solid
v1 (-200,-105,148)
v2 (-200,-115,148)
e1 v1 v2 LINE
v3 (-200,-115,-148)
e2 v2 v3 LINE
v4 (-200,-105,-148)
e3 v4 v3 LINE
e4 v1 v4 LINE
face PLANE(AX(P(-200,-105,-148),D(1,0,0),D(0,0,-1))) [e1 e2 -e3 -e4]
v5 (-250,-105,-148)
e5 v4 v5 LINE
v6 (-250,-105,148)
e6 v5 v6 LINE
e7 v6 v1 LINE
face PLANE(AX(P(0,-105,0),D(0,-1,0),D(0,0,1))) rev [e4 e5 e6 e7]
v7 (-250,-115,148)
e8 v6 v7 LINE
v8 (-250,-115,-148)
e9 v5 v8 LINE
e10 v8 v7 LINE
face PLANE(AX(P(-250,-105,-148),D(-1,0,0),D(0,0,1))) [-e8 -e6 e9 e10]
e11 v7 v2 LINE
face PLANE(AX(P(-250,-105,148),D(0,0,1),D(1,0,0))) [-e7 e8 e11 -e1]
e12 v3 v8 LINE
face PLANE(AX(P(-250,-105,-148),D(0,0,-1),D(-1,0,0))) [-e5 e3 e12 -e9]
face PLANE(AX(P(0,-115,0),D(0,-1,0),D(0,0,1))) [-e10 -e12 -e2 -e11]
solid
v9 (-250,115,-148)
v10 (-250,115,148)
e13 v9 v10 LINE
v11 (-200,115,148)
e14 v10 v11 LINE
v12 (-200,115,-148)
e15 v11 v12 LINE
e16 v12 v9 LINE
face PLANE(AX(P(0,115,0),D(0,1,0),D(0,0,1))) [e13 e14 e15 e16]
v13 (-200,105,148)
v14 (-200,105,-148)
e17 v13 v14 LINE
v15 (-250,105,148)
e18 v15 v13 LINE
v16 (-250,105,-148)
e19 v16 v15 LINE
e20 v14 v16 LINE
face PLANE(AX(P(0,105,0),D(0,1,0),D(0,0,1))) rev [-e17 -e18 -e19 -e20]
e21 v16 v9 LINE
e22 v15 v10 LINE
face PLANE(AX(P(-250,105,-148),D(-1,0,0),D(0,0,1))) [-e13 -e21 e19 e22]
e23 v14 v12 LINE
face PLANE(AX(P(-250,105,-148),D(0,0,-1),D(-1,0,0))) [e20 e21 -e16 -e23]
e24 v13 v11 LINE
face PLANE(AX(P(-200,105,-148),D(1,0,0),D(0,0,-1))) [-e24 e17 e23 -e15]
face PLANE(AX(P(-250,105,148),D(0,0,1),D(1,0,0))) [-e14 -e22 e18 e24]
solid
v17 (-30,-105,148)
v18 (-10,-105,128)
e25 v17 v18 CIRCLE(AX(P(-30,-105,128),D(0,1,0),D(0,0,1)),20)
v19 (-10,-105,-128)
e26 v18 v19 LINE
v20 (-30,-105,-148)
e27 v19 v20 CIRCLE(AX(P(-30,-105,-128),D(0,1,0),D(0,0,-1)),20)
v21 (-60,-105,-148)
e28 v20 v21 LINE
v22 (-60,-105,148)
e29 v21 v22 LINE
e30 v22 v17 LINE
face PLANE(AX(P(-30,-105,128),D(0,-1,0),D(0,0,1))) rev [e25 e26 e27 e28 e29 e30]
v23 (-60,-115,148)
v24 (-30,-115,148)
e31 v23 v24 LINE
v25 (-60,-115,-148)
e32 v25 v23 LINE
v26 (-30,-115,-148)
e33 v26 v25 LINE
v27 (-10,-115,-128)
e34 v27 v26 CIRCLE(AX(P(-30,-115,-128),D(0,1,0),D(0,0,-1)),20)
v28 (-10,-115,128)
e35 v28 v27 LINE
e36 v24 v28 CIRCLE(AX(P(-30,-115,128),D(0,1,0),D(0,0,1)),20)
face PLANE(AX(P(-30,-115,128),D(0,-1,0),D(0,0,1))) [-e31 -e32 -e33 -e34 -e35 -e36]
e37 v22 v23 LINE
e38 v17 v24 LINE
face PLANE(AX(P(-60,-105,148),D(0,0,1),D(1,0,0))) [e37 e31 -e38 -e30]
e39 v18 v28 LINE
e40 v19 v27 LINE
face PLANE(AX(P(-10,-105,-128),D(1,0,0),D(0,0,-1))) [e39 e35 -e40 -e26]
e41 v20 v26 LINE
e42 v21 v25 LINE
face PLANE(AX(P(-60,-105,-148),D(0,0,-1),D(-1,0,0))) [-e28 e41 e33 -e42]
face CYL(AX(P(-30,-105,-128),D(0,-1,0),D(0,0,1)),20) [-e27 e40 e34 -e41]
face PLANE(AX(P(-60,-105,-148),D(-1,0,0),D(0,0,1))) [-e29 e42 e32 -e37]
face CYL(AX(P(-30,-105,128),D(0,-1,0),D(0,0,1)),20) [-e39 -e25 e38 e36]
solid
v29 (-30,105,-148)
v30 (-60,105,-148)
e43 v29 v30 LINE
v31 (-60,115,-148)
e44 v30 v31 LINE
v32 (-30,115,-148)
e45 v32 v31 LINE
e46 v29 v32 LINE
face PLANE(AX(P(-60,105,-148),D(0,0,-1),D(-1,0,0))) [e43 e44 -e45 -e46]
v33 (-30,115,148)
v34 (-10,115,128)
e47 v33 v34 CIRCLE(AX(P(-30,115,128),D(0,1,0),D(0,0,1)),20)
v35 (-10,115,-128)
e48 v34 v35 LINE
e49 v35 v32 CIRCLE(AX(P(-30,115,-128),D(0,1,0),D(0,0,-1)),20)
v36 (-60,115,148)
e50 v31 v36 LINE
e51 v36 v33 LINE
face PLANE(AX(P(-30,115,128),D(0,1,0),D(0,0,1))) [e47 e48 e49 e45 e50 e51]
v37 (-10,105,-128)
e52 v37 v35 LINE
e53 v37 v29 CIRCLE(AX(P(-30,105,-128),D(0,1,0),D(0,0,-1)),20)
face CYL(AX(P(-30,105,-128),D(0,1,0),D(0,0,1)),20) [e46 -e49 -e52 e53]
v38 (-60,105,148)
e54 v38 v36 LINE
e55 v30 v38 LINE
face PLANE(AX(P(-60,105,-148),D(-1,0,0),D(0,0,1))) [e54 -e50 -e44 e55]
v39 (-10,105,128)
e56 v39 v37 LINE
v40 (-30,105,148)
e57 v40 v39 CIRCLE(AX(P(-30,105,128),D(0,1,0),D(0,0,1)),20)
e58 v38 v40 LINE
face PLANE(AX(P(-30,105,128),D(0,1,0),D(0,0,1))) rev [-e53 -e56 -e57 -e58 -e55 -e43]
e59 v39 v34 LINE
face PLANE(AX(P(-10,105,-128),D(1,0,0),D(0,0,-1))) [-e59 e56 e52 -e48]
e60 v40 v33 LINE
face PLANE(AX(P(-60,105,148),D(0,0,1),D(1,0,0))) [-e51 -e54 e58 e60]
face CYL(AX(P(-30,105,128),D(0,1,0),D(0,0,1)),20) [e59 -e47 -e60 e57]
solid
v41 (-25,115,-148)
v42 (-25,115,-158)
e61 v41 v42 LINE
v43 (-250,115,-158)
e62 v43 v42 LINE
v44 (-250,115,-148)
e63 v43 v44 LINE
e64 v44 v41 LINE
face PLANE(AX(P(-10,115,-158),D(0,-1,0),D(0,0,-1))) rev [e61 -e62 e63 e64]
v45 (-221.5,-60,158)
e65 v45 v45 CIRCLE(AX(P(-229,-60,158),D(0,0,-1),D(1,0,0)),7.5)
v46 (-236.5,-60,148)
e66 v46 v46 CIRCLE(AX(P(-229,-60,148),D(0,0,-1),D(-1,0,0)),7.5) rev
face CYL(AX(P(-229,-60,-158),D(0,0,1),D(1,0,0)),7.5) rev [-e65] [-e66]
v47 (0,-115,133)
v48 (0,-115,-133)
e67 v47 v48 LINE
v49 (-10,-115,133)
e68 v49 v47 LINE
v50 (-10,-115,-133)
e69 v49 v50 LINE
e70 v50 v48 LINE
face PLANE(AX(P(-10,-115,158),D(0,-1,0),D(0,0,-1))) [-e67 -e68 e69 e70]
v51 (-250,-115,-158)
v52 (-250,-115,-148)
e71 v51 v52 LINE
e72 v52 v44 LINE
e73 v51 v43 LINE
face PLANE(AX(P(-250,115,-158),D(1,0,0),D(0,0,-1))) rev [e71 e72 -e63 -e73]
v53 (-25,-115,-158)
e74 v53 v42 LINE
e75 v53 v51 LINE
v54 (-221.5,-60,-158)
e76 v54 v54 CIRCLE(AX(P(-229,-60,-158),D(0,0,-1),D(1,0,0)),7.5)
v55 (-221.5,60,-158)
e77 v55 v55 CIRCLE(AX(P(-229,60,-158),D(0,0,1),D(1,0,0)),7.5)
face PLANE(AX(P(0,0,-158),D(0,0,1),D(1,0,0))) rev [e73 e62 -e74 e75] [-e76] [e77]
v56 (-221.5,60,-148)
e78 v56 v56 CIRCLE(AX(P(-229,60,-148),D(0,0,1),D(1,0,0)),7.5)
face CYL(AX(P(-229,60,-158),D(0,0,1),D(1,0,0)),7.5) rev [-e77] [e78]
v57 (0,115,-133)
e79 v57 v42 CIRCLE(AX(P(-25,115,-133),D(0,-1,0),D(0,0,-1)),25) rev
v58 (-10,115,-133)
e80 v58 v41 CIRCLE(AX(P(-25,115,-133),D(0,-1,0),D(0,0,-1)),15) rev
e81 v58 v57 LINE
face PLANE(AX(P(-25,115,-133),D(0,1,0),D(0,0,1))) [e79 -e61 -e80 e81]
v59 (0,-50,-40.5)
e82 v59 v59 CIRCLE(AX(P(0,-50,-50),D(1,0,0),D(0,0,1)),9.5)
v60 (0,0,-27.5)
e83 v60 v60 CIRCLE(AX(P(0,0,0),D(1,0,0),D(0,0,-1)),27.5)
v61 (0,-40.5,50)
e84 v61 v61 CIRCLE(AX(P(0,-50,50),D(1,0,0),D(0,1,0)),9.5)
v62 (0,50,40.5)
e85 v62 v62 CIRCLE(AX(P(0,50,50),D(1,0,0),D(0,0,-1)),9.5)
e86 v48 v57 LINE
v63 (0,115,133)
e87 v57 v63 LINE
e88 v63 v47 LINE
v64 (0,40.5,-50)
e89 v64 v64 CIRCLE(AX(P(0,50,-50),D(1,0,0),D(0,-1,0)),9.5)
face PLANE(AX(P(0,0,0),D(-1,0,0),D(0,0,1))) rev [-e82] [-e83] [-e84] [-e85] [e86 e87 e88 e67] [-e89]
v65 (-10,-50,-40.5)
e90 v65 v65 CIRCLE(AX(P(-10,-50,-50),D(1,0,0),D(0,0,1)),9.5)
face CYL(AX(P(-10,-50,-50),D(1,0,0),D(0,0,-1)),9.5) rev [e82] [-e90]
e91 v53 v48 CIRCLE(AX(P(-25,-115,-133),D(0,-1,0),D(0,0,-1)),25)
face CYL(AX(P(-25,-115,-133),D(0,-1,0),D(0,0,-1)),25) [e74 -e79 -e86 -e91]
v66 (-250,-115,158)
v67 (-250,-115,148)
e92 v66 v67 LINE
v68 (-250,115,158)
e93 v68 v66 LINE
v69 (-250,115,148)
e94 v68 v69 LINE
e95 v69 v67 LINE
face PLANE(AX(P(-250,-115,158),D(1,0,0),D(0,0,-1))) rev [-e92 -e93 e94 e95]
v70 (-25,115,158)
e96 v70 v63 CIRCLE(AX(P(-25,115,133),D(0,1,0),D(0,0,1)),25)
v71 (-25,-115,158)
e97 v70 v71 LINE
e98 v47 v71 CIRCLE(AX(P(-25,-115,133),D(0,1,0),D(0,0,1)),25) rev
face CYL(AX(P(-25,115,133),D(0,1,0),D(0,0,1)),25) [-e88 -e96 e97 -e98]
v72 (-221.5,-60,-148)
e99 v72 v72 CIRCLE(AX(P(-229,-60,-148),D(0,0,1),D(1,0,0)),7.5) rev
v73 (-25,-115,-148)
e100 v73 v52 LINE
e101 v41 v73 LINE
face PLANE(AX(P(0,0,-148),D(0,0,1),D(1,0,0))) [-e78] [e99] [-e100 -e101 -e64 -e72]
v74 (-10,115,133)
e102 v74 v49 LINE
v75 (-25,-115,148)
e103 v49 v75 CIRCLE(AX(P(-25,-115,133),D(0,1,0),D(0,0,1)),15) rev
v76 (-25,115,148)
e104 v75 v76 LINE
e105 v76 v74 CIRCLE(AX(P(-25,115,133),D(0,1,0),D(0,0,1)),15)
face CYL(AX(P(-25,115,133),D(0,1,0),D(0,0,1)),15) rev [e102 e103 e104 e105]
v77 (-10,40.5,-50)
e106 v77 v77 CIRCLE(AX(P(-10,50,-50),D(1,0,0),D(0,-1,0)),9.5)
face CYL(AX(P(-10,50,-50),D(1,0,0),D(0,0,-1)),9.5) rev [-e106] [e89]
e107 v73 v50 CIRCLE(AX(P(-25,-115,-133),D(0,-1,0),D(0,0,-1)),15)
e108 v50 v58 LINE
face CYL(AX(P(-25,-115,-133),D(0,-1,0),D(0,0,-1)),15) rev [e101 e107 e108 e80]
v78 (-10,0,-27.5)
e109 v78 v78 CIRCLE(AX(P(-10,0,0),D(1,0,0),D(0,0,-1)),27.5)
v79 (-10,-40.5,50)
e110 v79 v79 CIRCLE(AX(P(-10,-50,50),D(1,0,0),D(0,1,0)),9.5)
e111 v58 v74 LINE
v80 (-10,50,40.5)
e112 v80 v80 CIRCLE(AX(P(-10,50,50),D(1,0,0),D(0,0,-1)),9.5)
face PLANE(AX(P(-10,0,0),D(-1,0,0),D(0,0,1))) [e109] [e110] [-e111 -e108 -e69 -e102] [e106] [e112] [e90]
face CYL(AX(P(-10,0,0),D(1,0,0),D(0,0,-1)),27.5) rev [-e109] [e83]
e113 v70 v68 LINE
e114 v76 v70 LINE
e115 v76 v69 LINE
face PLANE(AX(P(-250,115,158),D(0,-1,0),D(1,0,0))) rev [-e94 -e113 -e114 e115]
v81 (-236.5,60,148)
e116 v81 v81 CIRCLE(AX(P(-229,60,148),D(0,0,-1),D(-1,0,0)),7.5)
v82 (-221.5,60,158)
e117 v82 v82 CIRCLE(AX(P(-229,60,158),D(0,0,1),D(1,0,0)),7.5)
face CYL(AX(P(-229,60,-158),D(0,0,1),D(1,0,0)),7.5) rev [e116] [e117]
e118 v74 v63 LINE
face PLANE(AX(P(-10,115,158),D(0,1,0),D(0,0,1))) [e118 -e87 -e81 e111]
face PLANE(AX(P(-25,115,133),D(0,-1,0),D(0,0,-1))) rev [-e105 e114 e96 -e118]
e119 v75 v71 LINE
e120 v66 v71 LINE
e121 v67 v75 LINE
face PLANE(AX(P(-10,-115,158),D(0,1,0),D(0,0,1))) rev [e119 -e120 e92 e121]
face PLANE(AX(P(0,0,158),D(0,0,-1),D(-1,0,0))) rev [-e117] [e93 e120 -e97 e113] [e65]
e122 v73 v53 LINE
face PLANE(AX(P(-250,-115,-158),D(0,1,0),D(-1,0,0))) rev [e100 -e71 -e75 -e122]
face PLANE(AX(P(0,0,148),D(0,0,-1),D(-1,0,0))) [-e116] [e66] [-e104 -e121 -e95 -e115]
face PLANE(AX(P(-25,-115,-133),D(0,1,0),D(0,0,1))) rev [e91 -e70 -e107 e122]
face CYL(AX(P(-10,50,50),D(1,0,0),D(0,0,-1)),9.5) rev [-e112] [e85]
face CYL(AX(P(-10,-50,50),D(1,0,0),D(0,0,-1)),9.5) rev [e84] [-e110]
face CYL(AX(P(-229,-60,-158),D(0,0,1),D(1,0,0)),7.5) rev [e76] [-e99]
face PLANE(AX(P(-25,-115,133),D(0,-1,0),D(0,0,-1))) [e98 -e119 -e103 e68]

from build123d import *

# Parameters (mm, degrees)
SKETCH1_W                      = 316
SKETCH1_H                      = 230
BASE_FLANGE1_DEPTH             = 10
EDGE_FLANGE1_STRIP_W           = 70
EDGE_FLANGE1_STRIP_H           = 10
EDGE_FLANGE1_STRIP_CUT_DEPTH   = 230
EDGE_FLANGE1_STRIP_2_W         = 70
EDGE_FLANGE1_STRIP_2_H         = 10
EDGE_FLANGE1_STRIP_CUT_2_DEPTH = 230
EDGE_FLANGE1_DEPTH             = 230
EDGE_FLANGE1_BEND_DEPTH        = 230
SKETCH12_R                     = 27.5
CUT_EXTRUDE1_DEPTH             = 10
SKETCH13_R                     = 7.5
CUT_EXTRUDE2_DEPTH             = 420.023865669
SKETCH14_R                     = 9.5
CUT_EXTRUDE3_DEPTH             = 10
BOSS_EXTRUDE1_DEPTH            = 10
SKETCH15_W                     = 50
SKETCH15_H                     = 296
BOSS_EXTRUDE1_2_DEPTH          = 10
CIRPATTERN1_COUNT              = 4


# Sheet-metal steps are written as plain solids
with BuildPart() as part:
    # Sketch1 → Base-Flange1 (new body)
    with BuildSketch(Plane(origin=(0, 0, 0), x_dir=(0, 0, -1), z_dir=(1, 0, 0))):
        Rectangle(SKETCH1_W, SKETCH1_H)
    extrude(amount=-BASE_FLANGE1_DEPTH)

    # Edge-Flange1 strip (across the edge) → Edge-Flange1 strip cut (cut)
    with BuildSketch(Plane(origin=(-10, -115, 158), x_dir=(0, 0, -1), z_dir=(0, 1, 0))):
        with Locations((-10, -5)):
            Rectangle(EDGE_FLANGE1_STRIP_W, EDGE_FLANGE1_STRIP_H)
    extrude(amount=EDGE_FLANGE1_STRIP_CUT_DEPTH, mode=Mode.SUBTRACT)

    # Edge-Flange1 strip 2 (across the edge) → Edge-Flange1 strip cut 2 (cut)
    with BuildSketch(Plane(origin=(-10, 115, -158), x_dir=(0, 0, 1), z_dir=(0, -1, 0))):
        with Locations((-10, -5)):
            Rectangle(EDGE_FLANGE1_STRIP_2_W, EDGE_FLANGE1_STRIP_2_H)
    extrude(amount=EDGE_FLANGE1_STRIP_CUT_2_DEPTH, mode=Mode.SUBTRACT)

    # Edge-Flange1 section (across the edge) → Edge-Flange1 (add)
    with BuildSketch(Plane(origin=(-10, -115, 158), x_dir=(0, 0, -1), z_dir=(0, 1, 0))):
        with BuildLine():
            Line((0, 15), (0, 240))
            Line((0, 240), (10, 240))
            Line((10, 240), (10, 15))
            ThreePointArc((10, 15), (14.393398282, 4.393398282), (25, 0))
            Line((25, 0), (25, -10))
            ThreePointArc((25, -10), (7.32233047, -2.67766953), (0, 15))
        make_face()
    extrude(amount=EDGE_FLANGE1_DEPTH)

    # Edge-Flange1 section 2 (across the edge) → Edge-Flange1 bend (add)
    with BuildSketch(Plane(origin=(-10, 115, -158), x_dir=(0, 0, 1), z_dir=(0, -1, 0))):
        with BuildLine():
            Line((0, 15), (0, 240))
            Line((0, 240), (10, 240))
            Line((10, 240), (10, 15))
            ThreePointArc((10, 15), (14.393398282, 4.393398282), (25, 0))
            Line((25, 0), (25, -10))
            ThreePointArc((25, -10), (7.32233047, -2.67766953), (0, 15))
        make_face()
    extrude(amount=EDGE_FLANGE1_BEND_DEPTH)

    # Sketch12 → Cut-Extrude1 (cut)
    with BuildSketch(Plane(origin=(0, 0, 0), x_dir=(0, 0, -1), z_dir=(1, 0, 0))):
        Circle(SKETCH12_R)
    extrude(amount=-CUT_EXTRUDE1_DEPTH, mode=Mode.SUBTRACT)

    # Sketch13 → Cut-Extrude2 (cut, through all)
    with BuildSketch(Plane.XY.offset(158)):
        with Locations((-229, 60)):
            Circle(SKETCH13_R)
    cut_extrude2 = extrude(amount=-CUT_EXTRUDE2_DEPTH, mode=Mode.SUBTRACT)

    # Sketch14 → Cut-Extrude3 (cut)
    with BuildSketch(Plane(origin=(0, 0, 0), x_dir=(0, 0, -1), z_dir=(1, 0, 0))):
        with Locations((-50, 50)):
            Circle(SKETCH14_R)
    cut_extrude3 = extrude(amount=-CUT_EXTRUDE3_DEPTH, mode=Mode.SUBTRACT)

    # Mirror1: Cut-Extrude2 across plane
    add(cut_extrude2.mirror(Plane.ZX), mode=Mode.SUBTRACT)

    # CirPattern1: Cut-Extrude3 ×4 about axis
    cirpattern1_axis = Axis((0, 0, 0), (1, 0, 0))
    for i in range(1, CIRPATTERN1_COUNT):
        add(cut_extrude3.rotate(cirpattern1_axis, i * 360 / CIRPATTERN1_COUNT), mode=Mode.SUBTRACT)


with BuildPart() as body_2:
    # Sketch15 → Boss-Extrude1 (new body)
    with BuildSketch(Plane(origin=(0, 115, 0), x_dir=(1, 0, 0), z_dir=(0, 1, 0))):
        with BuildLine():
            Line((-60, 148), (-30, 148))
            ThreePointArc((-30, 148), (-15.857864376, 142.142135624), (-10, 128))
            Line((-10, 128), (-10, -128))
            ThreePointArc((-10, -128), (-15.857864376, -142.142135624), (-30, -148))
            Line((-30, -148), (-60, -148))
            Line((-60, -148), (-60, 148))
        make_face()
    extrude(amount=-BOSS_EXTRUDE1_DEPTH)


with BuildPart() as body_3:
    # Sketch15 → Boss-Extrude1 2 (new body)
    with BuildSketch(Plane(origin=(0, 115, 0), x_dir=(1, 0, 0), z_dir=(0, 1, 0))):
        with Locations((-225, 0)):
            Rectangle(SKETCH15_W, SKETCH15_H)
    extrude(amount=-BOSS_EXTRUDE1_2_DEPTH)


with BuildPart() as body_4:
    # Mirror2: mirrored copy
    add(body_2.part.mirror(Plane.ZX))


with BuildPart() as body_5:
    # Mirror2 2: mirrored copy
    add(body_3.part.mirror(Plane.ZX))


solid = Compound([part.part, body_2.part, body_3.part, body_4.part, body_5.part])
